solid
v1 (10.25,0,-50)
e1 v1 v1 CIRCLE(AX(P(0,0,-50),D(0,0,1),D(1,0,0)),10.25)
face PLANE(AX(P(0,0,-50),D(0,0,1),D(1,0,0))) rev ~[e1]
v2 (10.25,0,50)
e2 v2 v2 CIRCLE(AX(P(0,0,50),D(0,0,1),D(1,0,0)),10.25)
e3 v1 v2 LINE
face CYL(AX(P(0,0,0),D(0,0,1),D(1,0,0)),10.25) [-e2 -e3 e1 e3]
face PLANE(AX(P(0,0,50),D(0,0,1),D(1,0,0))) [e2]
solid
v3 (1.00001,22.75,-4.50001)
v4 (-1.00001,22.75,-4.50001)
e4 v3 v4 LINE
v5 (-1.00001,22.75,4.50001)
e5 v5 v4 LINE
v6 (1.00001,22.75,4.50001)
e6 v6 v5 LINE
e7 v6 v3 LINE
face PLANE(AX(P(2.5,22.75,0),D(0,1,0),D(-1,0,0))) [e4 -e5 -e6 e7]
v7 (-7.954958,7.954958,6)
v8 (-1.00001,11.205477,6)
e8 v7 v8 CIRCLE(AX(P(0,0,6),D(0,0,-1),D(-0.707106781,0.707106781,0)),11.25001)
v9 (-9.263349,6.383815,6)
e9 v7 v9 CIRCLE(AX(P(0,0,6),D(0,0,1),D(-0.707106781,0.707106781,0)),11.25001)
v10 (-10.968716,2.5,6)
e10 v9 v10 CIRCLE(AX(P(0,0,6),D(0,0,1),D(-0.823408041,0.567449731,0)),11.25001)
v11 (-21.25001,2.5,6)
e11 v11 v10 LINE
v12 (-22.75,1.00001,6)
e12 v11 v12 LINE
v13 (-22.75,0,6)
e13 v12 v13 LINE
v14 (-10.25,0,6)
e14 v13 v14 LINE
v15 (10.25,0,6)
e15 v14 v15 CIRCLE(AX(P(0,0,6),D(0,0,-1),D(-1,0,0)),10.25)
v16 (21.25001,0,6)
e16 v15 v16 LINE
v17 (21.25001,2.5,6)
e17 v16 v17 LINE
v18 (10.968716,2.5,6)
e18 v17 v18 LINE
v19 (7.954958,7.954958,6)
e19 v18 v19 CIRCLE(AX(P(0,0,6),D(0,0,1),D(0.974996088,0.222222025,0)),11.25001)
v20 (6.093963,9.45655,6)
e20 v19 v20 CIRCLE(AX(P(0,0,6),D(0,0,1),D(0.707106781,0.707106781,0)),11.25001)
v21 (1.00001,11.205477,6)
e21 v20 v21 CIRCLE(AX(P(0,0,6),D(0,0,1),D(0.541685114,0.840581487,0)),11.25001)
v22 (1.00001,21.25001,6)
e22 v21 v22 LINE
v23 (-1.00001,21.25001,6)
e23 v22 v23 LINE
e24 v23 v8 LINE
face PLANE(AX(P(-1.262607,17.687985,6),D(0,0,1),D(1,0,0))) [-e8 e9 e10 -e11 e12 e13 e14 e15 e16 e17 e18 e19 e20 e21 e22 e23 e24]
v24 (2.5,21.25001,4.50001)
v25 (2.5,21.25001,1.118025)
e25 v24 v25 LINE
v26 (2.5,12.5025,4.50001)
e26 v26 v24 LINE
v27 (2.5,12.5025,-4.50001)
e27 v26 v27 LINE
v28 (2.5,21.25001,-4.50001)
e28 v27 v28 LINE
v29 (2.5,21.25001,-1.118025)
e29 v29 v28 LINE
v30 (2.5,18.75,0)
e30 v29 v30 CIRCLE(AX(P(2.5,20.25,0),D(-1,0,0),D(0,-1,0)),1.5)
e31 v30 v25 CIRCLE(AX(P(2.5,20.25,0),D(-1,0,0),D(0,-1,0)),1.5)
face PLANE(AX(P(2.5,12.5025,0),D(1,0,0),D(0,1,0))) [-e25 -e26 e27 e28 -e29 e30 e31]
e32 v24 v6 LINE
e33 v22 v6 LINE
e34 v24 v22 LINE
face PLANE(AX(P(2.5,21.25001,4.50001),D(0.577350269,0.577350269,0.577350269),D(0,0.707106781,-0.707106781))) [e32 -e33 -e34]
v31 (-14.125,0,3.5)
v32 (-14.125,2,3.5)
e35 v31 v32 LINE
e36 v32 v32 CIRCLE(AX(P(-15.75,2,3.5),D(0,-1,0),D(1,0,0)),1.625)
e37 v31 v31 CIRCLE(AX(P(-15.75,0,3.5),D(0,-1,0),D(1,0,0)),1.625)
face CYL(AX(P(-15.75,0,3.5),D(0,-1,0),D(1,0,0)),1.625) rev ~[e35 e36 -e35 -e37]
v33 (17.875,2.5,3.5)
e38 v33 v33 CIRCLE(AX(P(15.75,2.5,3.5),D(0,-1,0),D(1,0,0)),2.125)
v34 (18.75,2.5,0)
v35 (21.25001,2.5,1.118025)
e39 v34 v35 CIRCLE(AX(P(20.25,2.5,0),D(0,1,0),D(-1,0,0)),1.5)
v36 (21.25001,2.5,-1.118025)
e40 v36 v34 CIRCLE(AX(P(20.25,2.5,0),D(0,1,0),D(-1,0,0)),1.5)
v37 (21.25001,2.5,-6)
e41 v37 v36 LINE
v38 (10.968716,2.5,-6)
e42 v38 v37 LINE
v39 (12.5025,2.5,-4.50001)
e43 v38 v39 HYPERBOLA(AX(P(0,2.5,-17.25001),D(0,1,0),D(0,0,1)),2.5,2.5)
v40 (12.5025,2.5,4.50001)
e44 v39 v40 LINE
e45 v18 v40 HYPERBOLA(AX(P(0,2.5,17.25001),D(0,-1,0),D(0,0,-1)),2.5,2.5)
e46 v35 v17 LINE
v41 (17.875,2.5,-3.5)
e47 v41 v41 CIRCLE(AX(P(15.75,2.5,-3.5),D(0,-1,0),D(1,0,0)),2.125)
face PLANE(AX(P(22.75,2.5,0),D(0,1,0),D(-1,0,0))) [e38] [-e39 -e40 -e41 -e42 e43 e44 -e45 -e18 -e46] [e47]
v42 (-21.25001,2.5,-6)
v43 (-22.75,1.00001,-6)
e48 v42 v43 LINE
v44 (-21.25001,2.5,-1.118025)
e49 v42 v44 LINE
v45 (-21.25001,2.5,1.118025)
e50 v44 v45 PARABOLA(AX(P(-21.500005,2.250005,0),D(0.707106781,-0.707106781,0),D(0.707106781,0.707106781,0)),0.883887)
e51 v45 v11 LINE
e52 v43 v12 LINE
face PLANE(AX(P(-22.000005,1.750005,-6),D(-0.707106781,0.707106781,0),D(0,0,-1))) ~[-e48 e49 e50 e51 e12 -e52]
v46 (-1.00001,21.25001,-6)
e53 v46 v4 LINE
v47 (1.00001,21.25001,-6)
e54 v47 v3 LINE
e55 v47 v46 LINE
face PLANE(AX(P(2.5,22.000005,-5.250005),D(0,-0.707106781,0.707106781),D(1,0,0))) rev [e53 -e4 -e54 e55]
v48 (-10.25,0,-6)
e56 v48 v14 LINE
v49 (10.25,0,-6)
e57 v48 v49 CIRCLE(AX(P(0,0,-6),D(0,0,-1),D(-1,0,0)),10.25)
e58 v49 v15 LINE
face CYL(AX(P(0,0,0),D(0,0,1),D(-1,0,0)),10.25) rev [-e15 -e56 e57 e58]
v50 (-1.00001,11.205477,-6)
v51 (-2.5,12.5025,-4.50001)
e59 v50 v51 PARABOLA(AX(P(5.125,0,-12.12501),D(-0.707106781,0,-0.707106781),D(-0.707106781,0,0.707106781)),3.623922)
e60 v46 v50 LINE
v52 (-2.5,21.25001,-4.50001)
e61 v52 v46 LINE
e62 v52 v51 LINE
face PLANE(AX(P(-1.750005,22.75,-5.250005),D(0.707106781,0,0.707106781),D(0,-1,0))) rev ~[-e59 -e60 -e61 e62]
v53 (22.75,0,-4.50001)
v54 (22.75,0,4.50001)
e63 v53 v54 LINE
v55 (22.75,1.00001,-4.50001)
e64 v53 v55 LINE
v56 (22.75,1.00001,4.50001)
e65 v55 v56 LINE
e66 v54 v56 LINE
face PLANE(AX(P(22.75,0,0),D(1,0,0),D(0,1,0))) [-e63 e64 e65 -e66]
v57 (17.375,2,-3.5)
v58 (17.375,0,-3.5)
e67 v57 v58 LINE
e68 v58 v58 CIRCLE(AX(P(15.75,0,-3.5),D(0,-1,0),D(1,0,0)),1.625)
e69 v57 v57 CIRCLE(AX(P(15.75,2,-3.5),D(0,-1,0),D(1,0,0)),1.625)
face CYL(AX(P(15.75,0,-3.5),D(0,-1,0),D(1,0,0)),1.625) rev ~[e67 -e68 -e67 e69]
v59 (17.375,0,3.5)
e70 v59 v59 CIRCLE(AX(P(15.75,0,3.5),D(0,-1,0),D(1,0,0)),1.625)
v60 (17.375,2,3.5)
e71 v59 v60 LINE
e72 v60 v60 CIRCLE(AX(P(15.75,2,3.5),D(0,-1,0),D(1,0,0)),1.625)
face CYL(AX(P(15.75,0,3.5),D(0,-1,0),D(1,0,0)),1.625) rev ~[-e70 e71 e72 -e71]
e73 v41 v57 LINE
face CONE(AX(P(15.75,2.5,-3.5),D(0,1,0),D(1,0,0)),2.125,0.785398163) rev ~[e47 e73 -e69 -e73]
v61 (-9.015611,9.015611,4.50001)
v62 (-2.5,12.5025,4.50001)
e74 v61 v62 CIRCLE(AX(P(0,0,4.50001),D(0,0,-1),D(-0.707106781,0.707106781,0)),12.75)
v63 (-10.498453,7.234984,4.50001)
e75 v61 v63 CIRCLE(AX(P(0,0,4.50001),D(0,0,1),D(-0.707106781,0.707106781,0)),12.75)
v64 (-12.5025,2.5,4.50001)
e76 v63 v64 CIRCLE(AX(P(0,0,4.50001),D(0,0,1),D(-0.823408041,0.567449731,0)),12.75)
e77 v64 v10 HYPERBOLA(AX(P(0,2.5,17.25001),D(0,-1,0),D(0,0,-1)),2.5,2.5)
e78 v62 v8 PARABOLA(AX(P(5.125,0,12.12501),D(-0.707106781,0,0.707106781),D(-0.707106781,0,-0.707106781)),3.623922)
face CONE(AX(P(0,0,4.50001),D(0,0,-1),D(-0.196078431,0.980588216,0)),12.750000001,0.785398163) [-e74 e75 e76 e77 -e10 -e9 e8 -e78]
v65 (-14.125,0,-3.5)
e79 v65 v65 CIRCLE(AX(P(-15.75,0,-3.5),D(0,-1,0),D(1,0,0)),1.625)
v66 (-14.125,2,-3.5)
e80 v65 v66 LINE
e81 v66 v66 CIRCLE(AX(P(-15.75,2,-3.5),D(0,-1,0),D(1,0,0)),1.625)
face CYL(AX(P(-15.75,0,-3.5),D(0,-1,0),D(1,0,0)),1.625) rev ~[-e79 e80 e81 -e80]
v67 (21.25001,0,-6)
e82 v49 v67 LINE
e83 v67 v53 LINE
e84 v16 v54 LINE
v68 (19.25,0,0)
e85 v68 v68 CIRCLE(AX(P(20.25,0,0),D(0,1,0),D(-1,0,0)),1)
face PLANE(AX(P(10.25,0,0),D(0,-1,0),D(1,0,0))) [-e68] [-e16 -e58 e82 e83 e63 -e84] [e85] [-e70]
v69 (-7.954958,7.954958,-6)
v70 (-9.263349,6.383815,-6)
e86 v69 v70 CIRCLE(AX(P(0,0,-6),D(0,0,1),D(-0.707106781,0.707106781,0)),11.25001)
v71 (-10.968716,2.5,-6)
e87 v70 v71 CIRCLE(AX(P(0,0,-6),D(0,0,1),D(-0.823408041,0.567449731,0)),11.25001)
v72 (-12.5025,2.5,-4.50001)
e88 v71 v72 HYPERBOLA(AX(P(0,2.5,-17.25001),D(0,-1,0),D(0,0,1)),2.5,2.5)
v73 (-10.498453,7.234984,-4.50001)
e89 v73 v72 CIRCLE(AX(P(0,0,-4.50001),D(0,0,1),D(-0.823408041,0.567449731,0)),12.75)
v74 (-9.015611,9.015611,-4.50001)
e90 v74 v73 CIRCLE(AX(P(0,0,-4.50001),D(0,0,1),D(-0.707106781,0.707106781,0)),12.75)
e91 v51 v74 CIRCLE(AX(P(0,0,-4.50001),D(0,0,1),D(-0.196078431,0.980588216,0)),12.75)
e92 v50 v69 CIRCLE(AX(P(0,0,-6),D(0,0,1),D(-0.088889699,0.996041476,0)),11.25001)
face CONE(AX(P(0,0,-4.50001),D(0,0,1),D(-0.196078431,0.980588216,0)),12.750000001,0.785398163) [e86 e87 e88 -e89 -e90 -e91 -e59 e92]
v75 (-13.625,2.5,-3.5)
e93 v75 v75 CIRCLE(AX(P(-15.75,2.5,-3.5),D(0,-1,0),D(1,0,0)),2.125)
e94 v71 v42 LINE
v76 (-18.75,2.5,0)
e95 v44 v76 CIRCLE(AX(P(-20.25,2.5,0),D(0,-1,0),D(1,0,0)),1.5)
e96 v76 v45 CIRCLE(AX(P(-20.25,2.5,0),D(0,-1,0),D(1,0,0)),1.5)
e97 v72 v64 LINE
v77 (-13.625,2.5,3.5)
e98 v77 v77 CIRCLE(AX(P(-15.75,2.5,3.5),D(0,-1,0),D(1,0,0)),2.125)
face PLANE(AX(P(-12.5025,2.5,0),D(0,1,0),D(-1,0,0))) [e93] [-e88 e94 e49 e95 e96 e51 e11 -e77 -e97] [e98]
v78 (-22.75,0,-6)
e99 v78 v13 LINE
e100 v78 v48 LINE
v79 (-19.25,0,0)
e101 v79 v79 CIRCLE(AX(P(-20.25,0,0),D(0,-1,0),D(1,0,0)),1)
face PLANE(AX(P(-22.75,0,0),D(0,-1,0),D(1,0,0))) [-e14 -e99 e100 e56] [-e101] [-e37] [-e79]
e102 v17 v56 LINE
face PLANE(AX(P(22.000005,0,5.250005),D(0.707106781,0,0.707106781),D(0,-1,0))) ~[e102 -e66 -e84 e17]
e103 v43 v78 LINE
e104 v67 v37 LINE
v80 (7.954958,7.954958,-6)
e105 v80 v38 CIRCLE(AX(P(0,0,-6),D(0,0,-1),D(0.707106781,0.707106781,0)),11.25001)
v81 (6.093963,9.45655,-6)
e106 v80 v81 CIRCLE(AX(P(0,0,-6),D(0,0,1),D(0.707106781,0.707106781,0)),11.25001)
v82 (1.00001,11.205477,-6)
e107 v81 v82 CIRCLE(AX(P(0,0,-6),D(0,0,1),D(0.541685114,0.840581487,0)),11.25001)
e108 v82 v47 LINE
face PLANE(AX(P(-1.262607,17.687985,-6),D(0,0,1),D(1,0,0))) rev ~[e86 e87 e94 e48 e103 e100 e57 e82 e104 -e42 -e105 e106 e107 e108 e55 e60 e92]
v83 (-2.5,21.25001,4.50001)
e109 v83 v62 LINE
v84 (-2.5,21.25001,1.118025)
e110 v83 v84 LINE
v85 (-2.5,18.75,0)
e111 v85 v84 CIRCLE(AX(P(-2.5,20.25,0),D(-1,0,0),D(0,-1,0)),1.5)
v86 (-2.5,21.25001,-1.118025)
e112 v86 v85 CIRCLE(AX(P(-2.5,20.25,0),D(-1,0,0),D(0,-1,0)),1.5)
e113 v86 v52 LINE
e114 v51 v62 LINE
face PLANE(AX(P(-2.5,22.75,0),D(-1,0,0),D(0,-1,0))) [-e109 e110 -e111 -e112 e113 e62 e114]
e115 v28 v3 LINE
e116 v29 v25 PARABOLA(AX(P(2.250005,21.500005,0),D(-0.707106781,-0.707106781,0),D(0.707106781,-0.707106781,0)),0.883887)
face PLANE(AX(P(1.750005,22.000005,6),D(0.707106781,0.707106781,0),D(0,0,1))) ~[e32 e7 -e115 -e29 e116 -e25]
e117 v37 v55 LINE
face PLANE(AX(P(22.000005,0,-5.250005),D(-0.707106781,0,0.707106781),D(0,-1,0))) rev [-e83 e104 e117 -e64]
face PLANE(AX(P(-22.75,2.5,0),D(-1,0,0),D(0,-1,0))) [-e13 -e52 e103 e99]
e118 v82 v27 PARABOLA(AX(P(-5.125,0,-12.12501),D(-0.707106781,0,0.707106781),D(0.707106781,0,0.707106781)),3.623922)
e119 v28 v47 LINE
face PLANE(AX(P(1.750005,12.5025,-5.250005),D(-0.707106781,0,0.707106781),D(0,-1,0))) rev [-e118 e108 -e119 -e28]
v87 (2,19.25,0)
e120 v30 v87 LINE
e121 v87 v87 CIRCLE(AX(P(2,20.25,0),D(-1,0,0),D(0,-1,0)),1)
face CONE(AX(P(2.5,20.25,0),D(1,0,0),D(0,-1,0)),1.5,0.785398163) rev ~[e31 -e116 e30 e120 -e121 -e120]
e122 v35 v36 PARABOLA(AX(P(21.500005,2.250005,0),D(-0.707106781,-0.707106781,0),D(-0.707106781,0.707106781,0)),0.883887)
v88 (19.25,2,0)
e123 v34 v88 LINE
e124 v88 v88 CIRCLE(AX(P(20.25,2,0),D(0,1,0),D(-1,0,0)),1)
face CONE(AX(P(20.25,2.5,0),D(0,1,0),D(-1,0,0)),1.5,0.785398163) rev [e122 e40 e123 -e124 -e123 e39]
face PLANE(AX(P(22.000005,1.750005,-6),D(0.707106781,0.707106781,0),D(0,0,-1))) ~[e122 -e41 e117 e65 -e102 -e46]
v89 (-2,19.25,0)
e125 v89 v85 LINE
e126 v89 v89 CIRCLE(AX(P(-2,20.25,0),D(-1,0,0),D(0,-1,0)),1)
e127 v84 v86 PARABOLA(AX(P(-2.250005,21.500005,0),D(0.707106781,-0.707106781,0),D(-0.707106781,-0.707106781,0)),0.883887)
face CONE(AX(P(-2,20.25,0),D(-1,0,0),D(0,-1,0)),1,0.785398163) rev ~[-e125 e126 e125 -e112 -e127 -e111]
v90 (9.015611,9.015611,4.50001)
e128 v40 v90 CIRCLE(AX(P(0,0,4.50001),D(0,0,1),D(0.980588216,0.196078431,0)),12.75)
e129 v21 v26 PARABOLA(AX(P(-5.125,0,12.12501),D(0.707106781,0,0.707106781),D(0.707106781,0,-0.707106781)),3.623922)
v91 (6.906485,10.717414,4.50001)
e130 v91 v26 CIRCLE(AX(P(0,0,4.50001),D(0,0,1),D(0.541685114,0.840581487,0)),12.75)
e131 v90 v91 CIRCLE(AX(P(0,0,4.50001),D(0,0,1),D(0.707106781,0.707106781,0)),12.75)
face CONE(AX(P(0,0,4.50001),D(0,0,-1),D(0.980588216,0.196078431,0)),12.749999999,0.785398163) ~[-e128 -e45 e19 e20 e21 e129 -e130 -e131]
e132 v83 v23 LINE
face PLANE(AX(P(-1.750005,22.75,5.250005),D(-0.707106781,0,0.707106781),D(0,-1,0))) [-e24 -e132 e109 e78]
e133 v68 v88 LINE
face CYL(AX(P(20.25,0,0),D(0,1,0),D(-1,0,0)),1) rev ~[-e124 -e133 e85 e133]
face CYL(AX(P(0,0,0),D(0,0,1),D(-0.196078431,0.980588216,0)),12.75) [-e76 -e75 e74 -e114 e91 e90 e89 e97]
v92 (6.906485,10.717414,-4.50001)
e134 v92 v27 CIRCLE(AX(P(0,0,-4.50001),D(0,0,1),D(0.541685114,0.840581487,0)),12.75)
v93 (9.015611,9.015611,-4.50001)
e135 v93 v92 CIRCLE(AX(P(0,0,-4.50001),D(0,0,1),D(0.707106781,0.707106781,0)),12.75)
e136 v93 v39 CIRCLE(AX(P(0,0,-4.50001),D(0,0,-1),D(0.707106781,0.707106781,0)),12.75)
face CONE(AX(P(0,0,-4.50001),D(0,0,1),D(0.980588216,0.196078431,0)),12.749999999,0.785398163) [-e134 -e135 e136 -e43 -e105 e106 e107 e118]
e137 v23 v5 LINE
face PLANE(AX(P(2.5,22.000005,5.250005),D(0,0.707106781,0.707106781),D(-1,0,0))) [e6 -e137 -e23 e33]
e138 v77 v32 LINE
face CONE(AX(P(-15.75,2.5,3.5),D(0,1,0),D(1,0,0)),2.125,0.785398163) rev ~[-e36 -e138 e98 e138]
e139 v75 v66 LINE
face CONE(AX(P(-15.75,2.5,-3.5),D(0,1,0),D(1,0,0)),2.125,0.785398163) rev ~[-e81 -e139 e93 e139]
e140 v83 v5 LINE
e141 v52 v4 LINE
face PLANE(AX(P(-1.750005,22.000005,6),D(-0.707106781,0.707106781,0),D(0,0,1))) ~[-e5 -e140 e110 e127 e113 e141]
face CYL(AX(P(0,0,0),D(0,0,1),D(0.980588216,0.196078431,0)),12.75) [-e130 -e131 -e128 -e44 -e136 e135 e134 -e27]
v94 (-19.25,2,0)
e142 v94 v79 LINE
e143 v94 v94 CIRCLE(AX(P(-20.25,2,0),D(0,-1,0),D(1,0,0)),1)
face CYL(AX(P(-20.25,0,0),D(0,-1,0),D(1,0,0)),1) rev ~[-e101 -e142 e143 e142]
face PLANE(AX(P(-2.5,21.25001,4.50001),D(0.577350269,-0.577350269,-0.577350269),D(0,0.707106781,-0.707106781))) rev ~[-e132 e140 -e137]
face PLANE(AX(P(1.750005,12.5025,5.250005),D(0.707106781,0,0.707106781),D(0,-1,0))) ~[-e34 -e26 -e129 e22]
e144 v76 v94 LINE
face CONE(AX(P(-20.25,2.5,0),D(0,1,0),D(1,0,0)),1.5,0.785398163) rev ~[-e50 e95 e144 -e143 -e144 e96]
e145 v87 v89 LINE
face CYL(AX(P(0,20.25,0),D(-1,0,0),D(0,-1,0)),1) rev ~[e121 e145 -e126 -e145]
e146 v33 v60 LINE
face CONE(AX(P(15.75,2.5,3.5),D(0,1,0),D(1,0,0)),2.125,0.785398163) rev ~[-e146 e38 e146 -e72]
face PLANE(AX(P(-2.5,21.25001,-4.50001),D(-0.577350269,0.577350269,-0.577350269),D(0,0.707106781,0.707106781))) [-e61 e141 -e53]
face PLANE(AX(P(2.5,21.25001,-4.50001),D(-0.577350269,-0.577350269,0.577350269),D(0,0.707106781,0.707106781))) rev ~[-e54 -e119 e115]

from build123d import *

# Parameters (mm, degrees)
F0_R     = 10.25
F1_DEPTH = 50
F3_DEPTH = 6
F4_R     = 1.625
F5_DEPTH = 12.5
F4_R_2   = 1
F6_DEPTH = 12.5
F7_COUNT = 4
F10_SIZE = 1.49999


# Not quite as in the source:
# - a fillet or chamfer that OpenCascade refuses, or shapes differently, is made with other operations: its cross-section is extruded or revolved along the edge and cut away or added
# - a fillet or chamfer is up to 0.001 mm smaller than in the source, because OpenCascade refuses the exact size


with BuildPart() as f1:
    # F0 (on Top) → F1 (new body, symmetric)
    with BuildSketch(Plane.XY):
        Circle(F0_R)
    extrude(amount=F1_DEPTH, both=True)


with BuildPart() as f3:
    # F2 (on Top) → F3 (new body, symmetric)
    with BuildSketch(Plane.XY):
        with BuildLine():
            Line((-2.5, 22.75), (-2.5, 12.50249975))
            ThreePointArc((-2.5, 12.50249975), (-1.2561107011, 12.6879740663), (0, 12.75))
            Line((0, 12.75), (0, 22.75))
            Line((0, 22.75), (-2.5, 22.75))
        make_face()
        with BuildLine():
            ThreePointArc((0, 12.75), (1.2561107011, 12.6879740663), (2.5, 12.50249975))
            Line((2.5, 12.50249975), (2.5, 22.75))
            Line((2.5, 22.75), (0, 22.75))
            Line((0, 22.75), (0, 12.75))
        make_face()
        with BuildLine():
            Line((-12.75, 0), (-10.25, 0))
            ThreePointArc((-10.25, 0), (0, 10.25), (10.25, 0))
            Line((10.25, 0), (12.75, 0))
            ThreePointArc((12.75, 0), (12.6879740663, 1.2561107011), (12.50249975, 2.5))
            ThreePointArc((12.50249975, 2.5), (11.7416340406, 4.9695603484), (10.4984525255, 7.2349840753))
            ThreePointArc((10.4984525255, 7.2349840753), (9.7975676461, 8.1590543705), (9.0156114601, 9.0156114601))
            ThreePointArc((9.0156114601, 9.0156114601), (8.0063926665, 9.9227101373), (6.9064852098, 10.7174139627))
            ThreePointArc((6.9064852098, 10.7174139627), (4.7871832864, 11.817164473), (2.5, 12.50249975))
            ThreePointArc((2.5, 12.50249975), (1.2561107011, 12.6879740663), (0, 12.75))
            ThreePointArc((0, 12.75), (-1.2561107011, 12.6879740663), (-2.5, 12.50249975))
            ThreePointArc((-2.5, 12.50249975), (-4.7871832864, 11.817164473), (-6.9064852098, 10.7174139627))
            ThreePointArc((-6.9064852098, 10.7174139627), (-8.0063926665, 9.9227101373), (-9.0156114601, 9.0156114601))
            ThreePointArc((-9.0156114601, 9.0156114601), (-9.7975676461, 8.1590543705), (-10.4984525255, 7.2349840753))
            ThreePointArc((-10.4984525255, 7.2349840753), (-11.7416340406, 4.9695603484), (-12.50249975, 2.5))
            ThreePointArc((-12.50249975, 2.5), (-12.6879740663, 1.2561107011), (-12.75, 0))
        make_face()
        with BuildLine():
            ThreePointArc((12.50249975, 2.5), (12.6879740663, 1.2561107011), (12.75, 0))
            Line((12.75, 0), (22.75, 0))
            Line((22.75, 0), (22.75, 2.5))
            Line((22.75, 2.5), (12.50249975, 2.5))
        make_face()
        with BuildLine():
            Line((-22.75, 0), (-12.75, 0))
            ThreePointArc((-12.75, 0), (-12.6879740663, 1.2561107011), (-12.50249975, 2.5))
            Line((-12.50249975, 2.5), (-22.75, 2.5))
            Line((-22.75, 2.5), (-22.75, 0))
        make_face()
    extrude(amount=F3_DEPTH, both=True)

    # F4 (on face) → F5 (cut, symmetric)
    with BuildSketch(Plane.XZ):
        with Locations((-15.75, 3.5)):
            Circle(F4_R)
        with Locations((-15.75, -3.5)):
            Circle(F4_R)
        with Locations((15.75, 3.5)):
            Circle(F4_R)
        with Locations((15.75, -3.5)):
            Circle(F4_R)
    extrude(amount=F5_DEPTH, both=True, mode=Mode.SUBTRACT)


with BuildPart() as f6:
    # F4 (on face) → F6 (new body, symmetric)
    with BuildSketch(Plane.XZ):
        with Locations((-20.25, 0)):
            Circle(F4_R_2)
    extrude(amount=F6_DEPTH, both=True)


with BuildPart() as f7_1:
    # F7: instance of F6
    add(f6.part.rotate(Axis((0, 0, 50), (0, 0, 1)), 1 * 360 / F7_COUNT))


with BuildPart() as f7_2:
    # F7: instance of F6
    add(f6.part.rotate(Axis((0, 0, 50), (0, 0, 1)), 2 * 360 / F7_COUNT))


with BuildPart() as f7_3:
    # F7: instance of F6
    add(f6.part.rotate(Axis((0, 0, 50), (0, 0, 1)), 3 * 360 / F7_COUNT))


with BuildPart() as f3_1:
    add(f3.part)

    # F9: cut F7_3, F6, F7_2
    add(f7_3.part, mode=Mode.SUBTRACT)
    add(f6.part, mode=Mode.SUBTRACT)
    add(f7_2.part, mode=Mode.SUBTRACT)

    # F10 (size 1.5 in the source; OpenCascade refuses exactly that, so slightly less here)
    f10_edges = [f3_1.edges().sort_by_distance(p)[0] for p in [
        (22.75, 1.25, 6),
        (22.75, 1.25, -6),
        (0, 22.75, -6),
        (0, 22.75, 6),
        (2.5, 17.62625, 6),
        (-2.5, 17.62625, 6),
        (9.015611, 9.015611, 6),
        (-9.015611, 9.015611, 6),
        (-9.015611, 9.015611, -6),
        (-2.5, 17.62625, -6),
        (2.5, 17.62625, -6),
        (9.015611, 9.015611, -6),
        (-2.5, 22.75, 0),
        (2.5, 22.75, 0),
        (-22.75, 2.5, 0),
        (22.75, 2.5, 0),
    ]]
    chamfer(f10_edges, length=F10_SIZE)

    # F11: chamfer of 0.5 on 8 edges, made by hand

    # F11_s1 → F11_t2 (revolve, cut)
    with BuildSketch(Plane.XY):
        Polygon((18.75, 2.5), (19.25, 2), (19.25, 2.5), align=None)
    revolve(axis=Axis((20.25, 2.5, 0), (0, 1, 0)), mode=Mode.SUBTRACT)

    # F11_s3 → F11_t4 (revolve, cut)
    with BuildSketch(Plane.XY):
        Polygon((2.5, 18.75), (2, 19.25), (2.5, 19.25), align=None)
    revolve(axis=Axis((2.5, 20.25, 0), (-1, 0, 0)), mode=Mode.SUBTRACT)

    # F11_s5 → F11_t6 (revolve, cut)
    with BuildSketch(Plane.XY):
        Polygon((-2, 19.25), (-2.5, 18.75), (-2.5, 19.25), align=None)
    revolve(axis=Axis((-2.5, 20.25, 0), (-1, 0, 0)), mode=Mode.SUBTRACT)

    # F11_s7 → F11_t8 (revolve, cut)
    with BuildSketch(Plane.XY.offset(3.5)):
        Polygon((17.875, 2.5), (17.375, 2), (17.375, 2.5), align=None)
    revolve(axis=Axis((15.75, 2.5, 3.5), (0, -1, 0)), mode=Mode.SUBTRACT)

    # F11_s9 → F11_t10 (revolve, cut)
    with BuildSketch(Plane.XY.offset(-3.5)):
        Polygon((17.875, 2.5), (17.375, 2), (17.375, 2.5), align=None)
    revolve(axis=Axis((15.75, 2.5, -3.5), (0, -1, 0)), mode=Mode.SUBTRACT)

    # F11_s11 → F11_t12 (revolve, cut)
    with BuildSketch(Plane.XY.offset(-3.5)):
        Polygon((-13.625, 2.5), (-14.125, 2), (-14.125, 2.5), align=None)
    revolve(axis=Axis((-15.75, 2.5, -3.5), (0, -1, 0)), mode=Mode.SUBTRACT)

    # F11_s13 → F11_t14 (revolve, cut)
    with BuildSketch(Plane.XY.offset(3.5)):
        Polygon((-13.625, 2.5), (-14.125, 2), (-14.125, 2.5), align=None)
    revolve(axis=Axis((-15.75, 2.5, 3.5), (0, -1, 0)), mode=Mode.SUBTRACT)

    # F11_s15 → F11_t16 (revolve, cut)
    with BuildSketch(Plane.XY):
        Polygon((-18.75, 2.5), (-19.25, 2), (-19.25, 2.5), align=None)
    revolve(axis=Axis((-20.25, 2.5, 0), (0, -1, 0)), mode=Mode.SUBTRACT)


solid = Compound([f1.part, f3_1.part])
